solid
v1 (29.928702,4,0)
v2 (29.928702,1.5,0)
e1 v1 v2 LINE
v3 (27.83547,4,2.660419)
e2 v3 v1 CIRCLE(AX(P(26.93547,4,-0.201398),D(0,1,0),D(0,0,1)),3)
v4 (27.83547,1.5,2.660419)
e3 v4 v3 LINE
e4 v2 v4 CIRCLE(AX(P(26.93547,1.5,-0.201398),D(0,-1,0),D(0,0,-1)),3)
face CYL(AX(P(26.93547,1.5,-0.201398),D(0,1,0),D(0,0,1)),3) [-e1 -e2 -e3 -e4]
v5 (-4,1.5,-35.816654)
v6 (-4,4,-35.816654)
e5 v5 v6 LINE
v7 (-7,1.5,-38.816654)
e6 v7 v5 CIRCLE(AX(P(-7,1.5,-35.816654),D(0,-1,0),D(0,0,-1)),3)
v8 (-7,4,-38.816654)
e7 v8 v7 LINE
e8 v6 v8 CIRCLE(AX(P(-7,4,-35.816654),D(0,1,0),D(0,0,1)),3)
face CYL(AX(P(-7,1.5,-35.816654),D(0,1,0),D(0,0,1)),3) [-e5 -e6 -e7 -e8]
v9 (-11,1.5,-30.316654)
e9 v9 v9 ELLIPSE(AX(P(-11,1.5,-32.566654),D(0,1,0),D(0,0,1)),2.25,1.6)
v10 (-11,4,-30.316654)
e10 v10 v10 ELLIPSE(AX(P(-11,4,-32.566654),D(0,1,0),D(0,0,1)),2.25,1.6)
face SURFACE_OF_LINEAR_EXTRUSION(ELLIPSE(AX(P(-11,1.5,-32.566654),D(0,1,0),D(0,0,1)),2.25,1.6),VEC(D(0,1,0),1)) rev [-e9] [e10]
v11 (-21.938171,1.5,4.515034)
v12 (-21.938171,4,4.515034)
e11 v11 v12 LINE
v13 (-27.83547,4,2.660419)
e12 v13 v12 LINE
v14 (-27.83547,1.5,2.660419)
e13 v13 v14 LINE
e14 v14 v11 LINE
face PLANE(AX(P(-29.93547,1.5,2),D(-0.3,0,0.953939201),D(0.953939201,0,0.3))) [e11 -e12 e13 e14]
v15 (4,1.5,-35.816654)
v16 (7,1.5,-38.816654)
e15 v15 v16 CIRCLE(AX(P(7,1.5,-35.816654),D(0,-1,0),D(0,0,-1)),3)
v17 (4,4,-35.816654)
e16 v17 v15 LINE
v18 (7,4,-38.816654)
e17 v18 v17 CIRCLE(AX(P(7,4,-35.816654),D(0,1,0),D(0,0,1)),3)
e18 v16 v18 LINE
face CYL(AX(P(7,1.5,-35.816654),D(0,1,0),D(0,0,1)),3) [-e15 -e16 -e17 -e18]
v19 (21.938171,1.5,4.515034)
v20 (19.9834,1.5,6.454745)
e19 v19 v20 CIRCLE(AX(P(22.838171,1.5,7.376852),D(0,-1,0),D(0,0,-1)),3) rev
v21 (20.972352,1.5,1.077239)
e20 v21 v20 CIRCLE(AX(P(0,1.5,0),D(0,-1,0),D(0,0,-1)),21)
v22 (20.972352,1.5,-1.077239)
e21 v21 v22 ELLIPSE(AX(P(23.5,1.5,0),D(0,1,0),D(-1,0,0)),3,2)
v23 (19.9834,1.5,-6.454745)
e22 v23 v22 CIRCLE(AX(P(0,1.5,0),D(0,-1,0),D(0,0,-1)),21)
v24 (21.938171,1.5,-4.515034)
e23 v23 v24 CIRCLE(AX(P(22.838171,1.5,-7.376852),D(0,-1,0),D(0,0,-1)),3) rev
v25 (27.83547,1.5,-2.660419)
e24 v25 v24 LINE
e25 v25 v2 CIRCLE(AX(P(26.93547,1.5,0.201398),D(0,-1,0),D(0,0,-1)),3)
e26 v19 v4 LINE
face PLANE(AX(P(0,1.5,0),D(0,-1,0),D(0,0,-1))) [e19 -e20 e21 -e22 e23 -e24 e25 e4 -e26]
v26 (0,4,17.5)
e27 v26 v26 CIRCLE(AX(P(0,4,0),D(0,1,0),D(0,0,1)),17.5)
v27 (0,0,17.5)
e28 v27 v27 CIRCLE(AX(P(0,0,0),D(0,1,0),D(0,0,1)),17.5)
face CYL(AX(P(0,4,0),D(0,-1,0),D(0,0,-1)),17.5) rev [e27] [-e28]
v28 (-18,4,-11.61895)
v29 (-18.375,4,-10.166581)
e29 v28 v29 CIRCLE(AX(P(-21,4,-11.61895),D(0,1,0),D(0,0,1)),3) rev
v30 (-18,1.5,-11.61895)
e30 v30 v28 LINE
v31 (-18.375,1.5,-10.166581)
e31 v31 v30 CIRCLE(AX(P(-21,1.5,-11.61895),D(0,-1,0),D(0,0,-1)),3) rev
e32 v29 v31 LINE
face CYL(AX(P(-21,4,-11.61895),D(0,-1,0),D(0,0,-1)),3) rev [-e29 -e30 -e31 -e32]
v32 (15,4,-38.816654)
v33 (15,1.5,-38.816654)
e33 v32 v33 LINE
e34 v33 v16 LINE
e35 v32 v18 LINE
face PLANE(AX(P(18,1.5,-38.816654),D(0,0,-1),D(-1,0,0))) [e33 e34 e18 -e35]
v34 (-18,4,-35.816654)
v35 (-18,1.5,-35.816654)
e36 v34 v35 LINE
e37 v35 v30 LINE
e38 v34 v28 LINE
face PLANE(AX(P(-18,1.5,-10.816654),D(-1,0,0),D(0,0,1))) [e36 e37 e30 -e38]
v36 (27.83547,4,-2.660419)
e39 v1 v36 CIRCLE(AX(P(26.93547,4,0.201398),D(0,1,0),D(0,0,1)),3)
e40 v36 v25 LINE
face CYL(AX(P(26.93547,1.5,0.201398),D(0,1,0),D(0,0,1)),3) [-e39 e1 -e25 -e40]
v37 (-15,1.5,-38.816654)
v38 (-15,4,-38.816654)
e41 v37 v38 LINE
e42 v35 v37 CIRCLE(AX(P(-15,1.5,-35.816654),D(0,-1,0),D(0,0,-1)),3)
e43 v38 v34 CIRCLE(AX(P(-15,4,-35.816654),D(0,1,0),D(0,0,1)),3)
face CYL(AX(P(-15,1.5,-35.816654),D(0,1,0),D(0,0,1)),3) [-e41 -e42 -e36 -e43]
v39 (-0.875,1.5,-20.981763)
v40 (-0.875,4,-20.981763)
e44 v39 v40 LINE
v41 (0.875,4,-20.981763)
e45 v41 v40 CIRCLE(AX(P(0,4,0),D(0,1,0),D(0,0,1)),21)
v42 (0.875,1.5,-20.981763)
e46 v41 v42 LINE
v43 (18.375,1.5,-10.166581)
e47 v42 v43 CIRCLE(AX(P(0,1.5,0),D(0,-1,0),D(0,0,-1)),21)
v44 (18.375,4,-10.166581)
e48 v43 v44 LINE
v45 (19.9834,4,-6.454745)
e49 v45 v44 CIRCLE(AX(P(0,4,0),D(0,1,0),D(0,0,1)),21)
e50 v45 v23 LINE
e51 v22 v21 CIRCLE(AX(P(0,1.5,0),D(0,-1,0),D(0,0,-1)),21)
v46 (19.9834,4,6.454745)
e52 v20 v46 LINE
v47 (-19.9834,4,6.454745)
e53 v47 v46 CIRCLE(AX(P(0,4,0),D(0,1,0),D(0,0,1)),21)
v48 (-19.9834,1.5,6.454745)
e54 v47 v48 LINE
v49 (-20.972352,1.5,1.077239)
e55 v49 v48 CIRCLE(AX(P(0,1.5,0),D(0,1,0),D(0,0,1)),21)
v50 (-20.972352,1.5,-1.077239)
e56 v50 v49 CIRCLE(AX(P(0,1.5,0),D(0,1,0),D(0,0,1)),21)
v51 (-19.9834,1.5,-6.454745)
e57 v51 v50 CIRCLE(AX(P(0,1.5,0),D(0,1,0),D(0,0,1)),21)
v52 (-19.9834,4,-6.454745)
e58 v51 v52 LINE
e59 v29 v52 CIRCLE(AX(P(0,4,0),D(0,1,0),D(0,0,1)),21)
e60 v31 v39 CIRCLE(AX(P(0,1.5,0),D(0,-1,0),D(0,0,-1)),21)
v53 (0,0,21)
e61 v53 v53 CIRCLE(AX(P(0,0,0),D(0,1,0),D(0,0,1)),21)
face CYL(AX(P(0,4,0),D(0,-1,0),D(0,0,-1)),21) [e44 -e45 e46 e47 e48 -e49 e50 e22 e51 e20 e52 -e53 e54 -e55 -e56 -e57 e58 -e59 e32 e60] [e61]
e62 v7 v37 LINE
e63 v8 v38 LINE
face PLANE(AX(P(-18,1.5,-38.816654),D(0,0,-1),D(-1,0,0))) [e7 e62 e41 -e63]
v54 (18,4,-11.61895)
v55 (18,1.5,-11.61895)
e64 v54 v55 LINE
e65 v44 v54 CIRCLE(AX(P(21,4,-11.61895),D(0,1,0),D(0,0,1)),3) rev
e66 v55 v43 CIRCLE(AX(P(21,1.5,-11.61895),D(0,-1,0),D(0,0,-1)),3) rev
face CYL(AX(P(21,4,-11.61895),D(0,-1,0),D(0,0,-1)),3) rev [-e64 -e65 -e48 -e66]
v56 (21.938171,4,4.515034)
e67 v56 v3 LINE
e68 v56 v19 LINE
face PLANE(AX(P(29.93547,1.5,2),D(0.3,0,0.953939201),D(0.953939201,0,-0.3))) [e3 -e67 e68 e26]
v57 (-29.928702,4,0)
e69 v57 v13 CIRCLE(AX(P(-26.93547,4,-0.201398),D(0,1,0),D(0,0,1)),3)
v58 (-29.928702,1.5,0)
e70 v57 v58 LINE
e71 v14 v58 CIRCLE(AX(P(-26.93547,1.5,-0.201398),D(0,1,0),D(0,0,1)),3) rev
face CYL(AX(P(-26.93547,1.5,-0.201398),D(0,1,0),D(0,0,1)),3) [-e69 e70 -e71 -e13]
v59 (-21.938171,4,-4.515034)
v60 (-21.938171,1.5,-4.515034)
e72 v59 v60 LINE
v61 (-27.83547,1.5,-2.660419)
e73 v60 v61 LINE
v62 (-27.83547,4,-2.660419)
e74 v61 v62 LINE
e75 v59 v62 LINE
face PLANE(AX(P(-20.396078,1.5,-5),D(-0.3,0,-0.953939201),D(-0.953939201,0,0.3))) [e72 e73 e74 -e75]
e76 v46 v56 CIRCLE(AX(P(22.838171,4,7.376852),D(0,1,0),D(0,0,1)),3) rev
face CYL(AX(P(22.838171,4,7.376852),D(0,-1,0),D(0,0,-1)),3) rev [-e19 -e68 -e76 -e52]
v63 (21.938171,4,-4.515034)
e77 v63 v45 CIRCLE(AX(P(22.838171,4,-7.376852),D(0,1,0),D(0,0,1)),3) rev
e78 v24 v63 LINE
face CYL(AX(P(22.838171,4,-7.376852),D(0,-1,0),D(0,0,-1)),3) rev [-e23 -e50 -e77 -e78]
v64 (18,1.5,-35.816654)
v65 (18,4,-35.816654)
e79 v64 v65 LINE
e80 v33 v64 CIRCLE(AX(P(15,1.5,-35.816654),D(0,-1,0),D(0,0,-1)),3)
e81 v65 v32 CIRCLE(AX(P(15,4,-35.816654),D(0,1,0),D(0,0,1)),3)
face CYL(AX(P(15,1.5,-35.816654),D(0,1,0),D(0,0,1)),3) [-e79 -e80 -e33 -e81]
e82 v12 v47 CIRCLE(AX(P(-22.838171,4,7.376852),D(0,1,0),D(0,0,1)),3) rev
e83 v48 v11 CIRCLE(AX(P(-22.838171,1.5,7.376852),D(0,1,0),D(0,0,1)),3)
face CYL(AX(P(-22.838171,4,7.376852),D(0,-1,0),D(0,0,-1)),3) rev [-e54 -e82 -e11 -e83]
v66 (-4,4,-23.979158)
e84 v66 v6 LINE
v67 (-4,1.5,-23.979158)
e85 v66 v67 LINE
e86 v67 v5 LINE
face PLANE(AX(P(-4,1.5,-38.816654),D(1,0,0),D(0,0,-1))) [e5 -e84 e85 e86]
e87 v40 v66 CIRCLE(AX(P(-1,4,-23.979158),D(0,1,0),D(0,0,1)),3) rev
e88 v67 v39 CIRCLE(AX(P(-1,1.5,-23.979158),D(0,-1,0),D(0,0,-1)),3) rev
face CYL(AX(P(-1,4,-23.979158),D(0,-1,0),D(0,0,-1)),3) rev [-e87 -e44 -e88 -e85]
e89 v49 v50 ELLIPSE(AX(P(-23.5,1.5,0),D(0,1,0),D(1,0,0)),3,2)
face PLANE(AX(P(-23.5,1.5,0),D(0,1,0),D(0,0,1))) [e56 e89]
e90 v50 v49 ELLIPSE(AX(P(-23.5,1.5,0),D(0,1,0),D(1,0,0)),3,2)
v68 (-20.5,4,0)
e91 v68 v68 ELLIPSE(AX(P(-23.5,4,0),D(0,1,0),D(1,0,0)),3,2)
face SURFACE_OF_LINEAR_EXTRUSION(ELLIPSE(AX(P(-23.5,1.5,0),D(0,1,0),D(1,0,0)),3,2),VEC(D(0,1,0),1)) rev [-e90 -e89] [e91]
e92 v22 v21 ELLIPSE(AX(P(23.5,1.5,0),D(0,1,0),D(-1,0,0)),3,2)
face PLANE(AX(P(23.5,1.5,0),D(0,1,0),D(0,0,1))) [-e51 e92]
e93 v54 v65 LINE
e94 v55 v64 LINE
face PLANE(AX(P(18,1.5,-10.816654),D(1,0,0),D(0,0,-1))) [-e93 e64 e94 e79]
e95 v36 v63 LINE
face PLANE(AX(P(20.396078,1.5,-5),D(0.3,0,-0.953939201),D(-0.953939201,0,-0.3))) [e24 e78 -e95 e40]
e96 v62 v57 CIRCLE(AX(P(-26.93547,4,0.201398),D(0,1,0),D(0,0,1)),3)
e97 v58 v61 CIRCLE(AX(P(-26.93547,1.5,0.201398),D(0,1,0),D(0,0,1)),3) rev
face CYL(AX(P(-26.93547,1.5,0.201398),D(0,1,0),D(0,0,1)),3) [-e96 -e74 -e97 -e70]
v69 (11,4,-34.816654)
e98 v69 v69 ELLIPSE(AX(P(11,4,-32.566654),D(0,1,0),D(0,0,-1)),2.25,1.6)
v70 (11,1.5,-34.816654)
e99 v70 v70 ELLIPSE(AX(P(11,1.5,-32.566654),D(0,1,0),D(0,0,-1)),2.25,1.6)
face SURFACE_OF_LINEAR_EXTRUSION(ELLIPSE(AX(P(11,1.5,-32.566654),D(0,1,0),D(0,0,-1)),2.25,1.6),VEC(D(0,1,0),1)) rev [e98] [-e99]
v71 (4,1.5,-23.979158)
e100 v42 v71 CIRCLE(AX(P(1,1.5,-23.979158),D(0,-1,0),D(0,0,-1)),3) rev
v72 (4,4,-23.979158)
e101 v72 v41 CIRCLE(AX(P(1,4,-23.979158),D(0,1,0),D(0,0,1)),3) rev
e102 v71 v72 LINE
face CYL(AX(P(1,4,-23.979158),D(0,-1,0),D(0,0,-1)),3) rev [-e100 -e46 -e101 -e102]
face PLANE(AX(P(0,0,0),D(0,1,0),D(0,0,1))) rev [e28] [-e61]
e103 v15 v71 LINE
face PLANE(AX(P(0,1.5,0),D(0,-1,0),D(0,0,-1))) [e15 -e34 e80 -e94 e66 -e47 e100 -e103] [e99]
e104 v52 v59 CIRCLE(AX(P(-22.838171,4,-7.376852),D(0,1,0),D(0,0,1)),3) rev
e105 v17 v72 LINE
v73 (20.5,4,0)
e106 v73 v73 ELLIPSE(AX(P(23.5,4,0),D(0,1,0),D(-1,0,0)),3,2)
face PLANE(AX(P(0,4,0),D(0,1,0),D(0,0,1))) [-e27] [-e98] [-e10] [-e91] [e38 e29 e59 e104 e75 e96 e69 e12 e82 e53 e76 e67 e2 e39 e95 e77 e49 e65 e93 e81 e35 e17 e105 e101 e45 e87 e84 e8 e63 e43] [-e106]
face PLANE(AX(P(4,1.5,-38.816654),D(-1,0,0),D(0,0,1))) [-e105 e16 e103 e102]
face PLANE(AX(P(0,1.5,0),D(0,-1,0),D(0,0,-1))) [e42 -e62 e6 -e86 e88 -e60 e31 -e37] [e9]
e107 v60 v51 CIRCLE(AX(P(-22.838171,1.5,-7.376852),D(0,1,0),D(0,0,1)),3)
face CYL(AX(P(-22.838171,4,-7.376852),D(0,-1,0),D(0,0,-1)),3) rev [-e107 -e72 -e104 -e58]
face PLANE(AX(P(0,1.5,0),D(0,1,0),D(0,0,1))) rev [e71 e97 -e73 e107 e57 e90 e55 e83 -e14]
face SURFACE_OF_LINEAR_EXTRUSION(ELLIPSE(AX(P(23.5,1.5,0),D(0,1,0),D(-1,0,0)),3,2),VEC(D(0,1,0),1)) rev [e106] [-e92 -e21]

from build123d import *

# Parameters (mm, degrees)
SKETCH1_R           = 21
SKETCH1_R_2         = 17.5
BOSS_EXTRUDE1_DEPTH = 4
BOSS_EXTRUDE2_DEPTH = 2.5
SKETCH3_RX          = 2.25
SKETCH3_RY          = 1.6
SKETCH3_RX_2        = 3
SKETCH3_RY_2        = 2
CUT_EXTRUDE1_DEPTH  = 2.5
FILLET1_R           = 3


with BuildPart() as part:
    # Sketch1 → Boss-Extrude1 (new body)
    with BuildSketch(Plane(origin=(0, 0, 0), x_dir=(1, 0, 0), z_dir=(0, 1, 0))):
        with Locations(Location((0, 0, 0), (0, 0, 270))):
            Circle(SKETCH1_R)
        with Locations(Location((0, 0, 0), (0, 0, 270))):
            Circle(SKETCH1_R_2, mode=Mode.SUBTRACT)
    extrude(amount=BOSS_EXTRUDE1_DEPTH)

    # Sketch2 → Boss-Extrude2 (add)
    with BuildSketch(Plane(origin=(0, 4, 0), x_dir=(1, 0, 0), z_dir=(0, 1, 0))):
        Polygon((-20.396078054, 5), (-29.935470069, 2), (-29.935470069, -2), (-20.396078054, -5), align=None)
        Polygon((20.396078054, -5), (20.396078054, 5), (29.935470069, 2), (29.935470069, -2), align=None)
        Polygon((-18, 10.816653826), (-18, 38.816653826), (-4, 38.816653826), (-4, 20.615528128), align=None)
        Polygon((4, 20.615528128), (18, 10.816653826), (18, 38.816653826), (4, 38.816653826), align=None)
    extrude(amount=-BOSS_EXTRUDE2_DEPTH)

    # Sketch3 → Cut-Extrude1 (cut)
    with BuildSketch(Plane(origin=(0, 4, 0), x_dir=(1, 0, 0), z_dir=(0, 1, 0))):
        with Locations(Location((-11, 32.566653826), (0, 0, 90))):
            Ellipse(SKETCH3_RX, SKETCH3_RY)
        with Locations(Location((11, 32.566653826), (0, 0, 90))):
            Ellipse(SKETCH3_RX, SKETCH3_RY)
        with Locations((-23.5, 0)):
            Ellipse(SKETCH3_RX_2, SKETCH3_RY_2)
        with Locations(Location((23.5, 0), (0, 0, 180))):
            Ellipse(SKETCH3_RX_2, SKETCH3_RY_2)
    extrude(amount=-CUT_EXTRUDE1_DEPTH, mode=Mode.SUBTRACT)

    # Fillet1
    # the kernel refuses this fillet: 3 mm, written as the material it adds along each edge
    with BuildSketch(Plane(origin=(-18, 4, -10.816653826), x_dir=(-0.4996806126682358, 0, 0.8662097236371205), z_dir=(0, -1, 0))) as fillet1_piece_1:
        with BuildLine():
            CenterArc((0.804085058, 2.999521034), FILLET1_R, 240.021128247, 28.955024372)
            Line((-0.69495678, 0.400891863), (0, 0))
            ThreePointArc((0, 0), (0.375239694, 0.003352764), (0.750479387, 0))
        make_face()
    extrude(amount=2.5)
    with BuildSketch(Plane(origin=(-4, 4, -20.615528128), x_dir=(0.9932025912341629, 0, -0.11639850843436236), z_dir=(0, -1, 0))) as fillet1_piece_2:
        with BuildLine():
            CenterArc((3.371129229, -2.991569999), FILLET1_R, 94.296279982, 92.388015463)
            Line((0.391521455, -3.340765524), (0, 0))
            ThreePointArc((0, 0), (1.57319364, -0.05901001), (3.14638728, 0))
        make_face()
    extrude(amount=2.5)
    with BuildSketch(Plane(origin=(4, 4, -20.615528128), x_dir=(-0.9932025912341629, 0, -0.11639850843436243), z_dir=(0, -1, 0))) as fillet1_piece_3:
        with BuildLine():
            CenterArc((3.371129229, 2.991569999), FILLET1_R, 173.315704555, 92.388015463)
            Line((0.391521455, 3.340765524), (0, 0))
            ThreePointArc((0, 0), (1.57319364, 0.05901001), (3.14638728, 0))
        make_face()
    extrude(amount=2.5)
    with BuildSketch(Plane(origin=(18, 4, -10.816653826), x_dir=(0.4996806126682291, 0, 0.8662097236371242), z_dir=(0, -1, 0))) as fillet1_piece_4:
        with BuildLine():
            CenterArc((0.804085058, -2.999521034), FILLET1_R, 91.023847381, 28.955024372)
            Line((-0.69495678, -0.400891863), (0, 0))
            ThreePointArc((0, 0), (0.375239694, -0.003352764), (0.750479387, 0))
        make_face()
    extrude(amount=2.5)
    with BuildSketch(Plane(origin=(20.396078054, 4, -5), x_dir=(-0.2729089679529711, 0, -0.9620398615498447), z_dir=(0, -1, 0)), Plane(origin=(-20.396078054, 4, 5), x_dir=(0.2729089679529655, 0, 0.9620398615498462), z_dir=(0, -1, 0))) as fillet1_piece_5:
        with BuildLine():
            CenterArc((1.620157081, 2.998054992), FILLET1_R, 213.295044107, 54.641661907)
            Line((-0.88740746, 1.351203428), (0, 0))
            ThreePointArc((0, 0), (0.756073304, 0.013615053), (1.512146609, 0))
        make_face()
    extrude(amount=2.5)
    with BuildSketch(Plane(origin=(20.396078054, 4, 5), x_dir=(-0.2729089679529669, 0, 0.9620398615498458), z_dir=(0, -1, 0)), Plane(origin=(-20.396078054, 4, -5), x_dir=(0.27290896795296393, 0, -0.9620398615498467), z_dir=(0, -1, 0))) as fillet1_piece_6:
        with BuildLine():
            CenterArc((1.620157081, -2.998054992), FILLET1_R, 92.063293986, 54.641661907)
            Line((-0.88740746, -1.351203428), (0, 0))
            ThreePointArc((0, 0), (0.756073304, -0.013615053), (1.512146609, 0))
        make_face()
    extrude(amount=2.5)
    # the kernel refuses this fillet: 3 mm, written as the material it takes off along each edge
    with BuildSketch(Plane(origin=(-18, 11.5, -38.816653826), x_dir=(0, 0, 1), z_dir=(0, -1, 0)), Plane(origin=(-4, 11.5, -38.816653826), x_dir=(-1, 0, 0), z_dir=(0, -1, 0)), Plane(origin=(4, 11.5, -38.816653826), x_dir=(0, 0, 1), z_dir=(0, -1, 0)), Plane(origin=(18, 11.5, -38.816653826), x_dir=(-1, 0, 0), z_dir=(0, -1, 0))) as fillet1_2_piece_1:
        with BuildLine():
            CenterArc((FILLET1_R, -FILLET1_R), FILLET1_R, 90, 90)
            Line((0, -FILLET1_R), (0, 0))
            Line((0, 0), (FILLET1_R, 0))
        make_face()
    extrude(amount=17.5, mode=Mode.SUBTRACT)
    with BuildSketch(Plane(origin=(29.935470069, 9.503495393, -2), x_dir=(-0.9539392014169457, 0, -0.30000000000000027), z_dir=(0, -1, 0)), Plane(origin=(29.935470069, 9.503495393, 2), x_dir=(0, 0, -1), z_dir=(0, -1, 0)), Plane(origin=(-29.935470069, 9.503495393, 2), x_dir=(0.9539392014169454, 0, 0.3000000000000004), z_dir=(0, -1, 0)), Plane(origin=(-29.935470069, 9.503495393, -2), x_dir=(0, 0, 1), z_dir=(0, -1, 0))) as fillet1_2_piece_2:
        with BuildLine():
            CenterArc((FILLET1_R * 0.733799385705, -FILLET1_R), FILLET1_R, 90, 72.542396876)
            Line((-FILLET1_R * 0.220139815712, -FILLET1_R * 0.7), (0, 0))
            Line((0, 0), (FILLET1_R * 0.733799385705, 0))
        make_face()
    extrude(amount=13.506990786, mode=Mode.SUBTRACT)


solid = part.part
